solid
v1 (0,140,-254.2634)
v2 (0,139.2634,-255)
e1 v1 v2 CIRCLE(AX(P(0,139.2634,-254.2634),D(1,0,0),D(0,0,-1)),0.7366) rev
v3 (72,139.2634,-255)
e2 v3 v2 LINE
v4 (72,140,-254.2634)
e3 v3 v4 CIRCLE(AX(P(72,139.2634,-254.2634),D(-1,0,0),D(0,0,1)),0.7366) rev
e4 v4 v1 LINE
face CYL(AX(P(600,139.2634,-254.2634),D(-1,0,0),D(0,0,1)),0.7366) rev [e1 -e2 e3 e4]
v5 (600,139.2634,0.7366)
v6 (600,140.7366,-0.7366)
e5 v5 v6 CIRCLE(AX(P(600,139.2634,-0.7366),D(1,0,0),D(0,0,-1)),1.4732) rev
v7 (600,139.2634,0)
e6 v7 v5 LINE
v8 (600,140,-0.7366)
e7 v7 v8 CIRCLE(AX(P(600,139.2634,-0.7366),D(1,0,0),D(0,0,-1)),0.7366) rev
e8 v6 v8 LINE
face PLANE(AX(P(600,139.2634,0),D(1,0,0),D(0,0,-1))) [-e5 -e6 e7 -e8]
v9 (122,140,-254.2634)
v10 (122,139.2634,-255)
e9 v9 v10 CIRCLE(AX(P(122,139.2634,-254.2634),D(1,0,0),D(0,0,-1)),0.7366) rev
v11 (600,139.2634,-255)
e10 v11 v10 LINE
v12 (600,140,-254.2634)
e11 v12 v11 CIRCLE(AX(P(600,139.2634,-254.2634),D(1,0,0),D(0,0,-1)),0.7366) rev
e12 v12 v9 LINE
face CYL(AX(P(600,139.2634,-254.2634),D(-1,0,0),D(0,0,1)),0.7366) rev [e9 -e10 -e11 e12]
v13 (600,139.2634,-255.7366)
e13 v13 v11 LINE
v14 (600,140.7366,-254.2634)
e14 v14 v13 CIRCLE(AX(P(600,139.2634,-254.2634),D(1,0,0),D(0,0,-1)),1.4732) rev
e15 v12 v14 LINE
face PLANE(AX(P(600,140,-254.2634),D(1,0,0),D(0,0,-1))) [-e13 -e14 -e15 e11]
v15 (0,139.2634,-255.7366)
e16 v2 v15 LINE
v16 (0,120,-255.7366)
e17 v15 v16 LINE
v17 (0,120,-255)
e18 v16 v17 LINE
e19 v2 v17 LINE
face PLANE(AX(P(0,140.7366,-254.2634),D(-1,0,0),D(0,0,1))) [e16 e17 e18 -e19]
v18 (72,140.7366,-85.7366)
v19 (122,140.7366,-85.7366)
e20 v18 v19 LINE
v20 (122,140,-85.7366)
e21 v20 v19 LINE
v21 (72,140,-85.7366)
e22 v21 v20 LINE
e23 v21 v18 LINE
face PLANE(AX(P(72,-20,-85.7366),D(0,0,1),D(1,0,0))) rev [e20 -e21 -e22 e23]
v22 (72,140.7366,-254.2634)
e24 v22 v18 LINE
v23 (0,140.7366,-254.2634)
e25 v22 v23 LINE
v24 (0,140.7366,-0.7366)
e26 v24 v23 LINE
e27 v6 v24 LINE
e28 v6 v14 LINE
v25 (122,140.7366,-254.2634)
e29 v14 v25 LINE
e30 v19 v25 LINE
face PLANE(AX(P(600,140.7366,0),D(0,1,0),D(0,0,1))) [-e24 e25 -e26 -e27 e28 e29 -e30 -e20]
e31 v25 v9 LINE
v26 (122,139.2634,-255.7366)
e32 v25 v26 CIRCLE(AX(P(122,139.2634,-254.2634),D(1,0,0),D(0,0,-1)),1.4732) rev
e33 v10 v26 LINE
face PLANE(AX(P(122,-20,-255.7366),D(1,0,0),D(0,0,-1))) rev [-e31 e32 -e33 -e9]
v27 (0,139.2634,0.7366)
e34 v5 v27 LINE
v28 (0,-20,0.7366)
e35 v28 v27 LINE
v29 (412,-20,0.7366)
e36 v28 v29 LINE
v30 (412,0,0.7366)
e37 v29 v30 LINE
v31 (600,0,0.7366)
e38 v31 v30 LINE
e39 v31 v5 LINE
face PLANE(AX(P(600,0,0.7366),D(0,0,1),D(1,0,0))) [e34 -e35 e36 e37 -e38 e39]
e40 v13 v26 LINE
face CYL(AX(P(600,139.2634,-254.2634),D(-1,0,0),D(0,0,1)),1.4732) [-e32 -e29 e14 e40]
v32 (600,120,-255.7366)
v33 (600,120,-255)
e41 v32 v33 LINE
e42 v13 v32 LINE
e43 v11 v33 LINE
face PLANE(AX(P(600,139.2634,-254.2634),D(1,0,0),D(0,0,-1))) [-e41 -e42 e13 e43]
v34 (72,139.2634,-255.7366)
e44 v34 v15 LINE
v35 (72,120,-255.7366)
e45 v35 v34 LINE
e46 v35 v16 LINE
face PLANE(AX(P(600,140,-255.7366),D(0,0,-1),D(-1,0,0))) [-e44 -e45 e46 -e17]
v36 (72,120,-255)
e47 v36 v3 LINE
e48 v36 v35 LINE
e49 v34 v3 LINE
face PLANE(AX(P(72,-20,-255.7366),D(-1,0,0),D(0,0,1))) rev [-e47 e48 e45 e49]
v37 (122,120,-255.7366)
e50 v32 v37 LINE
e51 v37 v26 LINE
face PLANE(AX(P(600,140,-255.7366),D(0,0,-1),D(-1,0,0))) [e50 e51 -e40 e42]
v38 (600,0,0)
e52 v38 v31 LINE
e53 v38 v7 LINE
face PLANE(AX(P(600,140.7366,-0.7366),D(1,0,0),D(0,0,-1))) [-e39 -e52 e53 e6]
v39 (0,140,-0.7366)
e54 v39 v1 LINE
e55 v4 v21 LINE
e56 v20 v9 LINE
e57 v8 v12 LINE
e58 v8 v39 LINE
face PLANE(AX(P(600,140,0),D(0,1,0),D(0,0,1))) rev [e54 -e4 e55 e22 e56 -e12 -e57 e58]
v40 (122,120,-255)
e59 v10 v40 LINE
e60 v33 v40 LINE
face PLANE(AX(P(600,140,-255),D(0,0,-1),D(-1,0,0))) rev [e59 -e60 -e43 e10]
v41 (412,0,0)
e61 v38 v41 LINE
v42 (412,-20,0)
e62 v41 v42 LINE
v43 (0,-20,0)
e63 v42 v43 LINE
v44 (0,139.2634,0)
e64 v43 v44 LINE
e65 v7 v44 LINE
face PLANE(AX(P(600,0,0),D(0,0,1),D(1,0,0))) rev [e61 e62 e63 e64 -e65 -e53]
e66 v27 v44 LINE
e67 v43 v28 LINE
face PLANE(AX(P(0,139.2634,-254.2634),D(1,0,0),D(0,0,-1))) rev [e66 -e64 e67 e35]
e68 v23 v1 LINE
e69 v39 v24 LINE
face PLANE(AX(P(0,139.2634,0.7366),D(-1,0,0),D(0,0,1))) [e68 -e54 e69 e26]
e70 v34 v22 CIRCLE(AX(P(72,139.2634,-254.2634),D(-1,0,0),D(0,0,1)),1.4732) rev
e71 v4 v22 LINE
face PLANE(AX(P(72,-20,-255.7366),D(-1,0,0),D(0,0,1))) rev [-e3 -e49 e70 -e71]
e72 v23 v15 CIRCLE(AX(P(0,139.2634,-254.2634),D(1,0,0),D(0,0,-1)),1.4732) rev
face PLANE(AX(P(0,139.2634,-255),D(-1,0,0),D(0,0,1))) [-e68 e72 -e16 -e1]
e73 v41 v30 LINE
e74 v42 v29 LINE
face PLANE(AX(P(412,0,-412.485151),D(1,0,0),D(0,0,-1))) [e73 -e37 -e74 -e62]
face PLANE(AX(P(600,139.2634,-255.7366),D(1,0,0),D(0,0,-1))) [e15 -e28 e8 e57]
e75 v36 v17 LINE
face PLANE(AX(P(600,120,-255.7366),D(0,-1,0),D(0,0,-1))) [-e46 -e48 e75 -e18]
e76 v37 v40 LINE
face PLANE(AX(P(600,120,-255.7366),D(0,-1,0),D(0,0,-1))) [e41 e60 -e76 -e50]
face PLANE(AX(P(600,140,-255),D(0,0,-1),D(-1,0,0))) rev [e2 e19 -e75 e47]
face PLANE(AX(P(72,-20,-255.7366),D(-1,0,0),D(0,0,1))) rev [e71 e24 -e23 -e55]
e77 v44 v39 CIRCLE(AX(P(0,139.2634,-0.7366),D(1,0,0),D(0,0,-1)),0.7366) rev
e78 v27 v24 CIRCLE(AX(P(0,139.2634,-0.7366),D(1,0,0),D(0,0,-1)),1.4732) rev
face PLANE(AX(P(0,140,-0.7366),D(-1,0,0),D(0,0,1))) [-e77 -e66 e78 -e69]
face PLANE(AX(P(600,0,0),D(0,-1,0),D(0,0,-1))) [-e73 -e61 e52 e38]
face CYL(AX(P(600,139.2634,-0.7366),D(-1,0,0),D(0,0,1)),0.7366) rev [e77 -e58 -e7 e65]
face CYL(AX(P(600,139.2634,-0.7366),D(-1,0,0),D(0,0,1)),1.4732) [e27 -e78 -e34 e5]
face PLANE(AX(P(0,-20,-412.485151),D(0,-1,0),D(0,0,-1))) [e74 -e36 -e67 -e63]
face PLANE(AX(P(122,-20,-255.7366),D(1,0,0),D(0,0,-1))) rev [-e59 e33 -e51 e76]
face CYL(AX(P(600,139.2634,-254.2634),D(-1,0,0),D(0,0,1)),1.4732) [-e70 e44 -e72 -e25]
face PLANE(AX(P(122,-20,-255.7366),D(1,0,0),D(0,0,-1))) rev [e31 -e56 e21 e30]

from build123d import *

# Parameters (mm, degrees)
BASE_FLANGE1_DEPTH  = 600
SKETCH7_W           = 412
SKETCH7_H           = 20
BOSS_EXTRUDE1_DEPTH = 0.7366
SKETCH8_W           = 50
SKETCH8_H           = 170
CUT_EXTRUDE2_DEPTH  = 672.742110604


# Sheet-metal steps are written as plain solids
with BuildPart() as part:
    # Sketch1 → Base-Flange1 (new body)
    with BuildSketch(Plane(origin=(0, 0, 0), x_dir=(0, 0, -1), z_dir=(1, 0, 0))):
        with BuildLine():
            Line((0, 0), (0, 139.2634))
            ThreePointArc((0, 139.2634), (0.215745145, 139.784254855), (0.7366, 140))
            Line((0.7366, 140), (254.2634, 140))
            ThreePointArc((254.2634, 140), (254.784254855, 139.784254855), (255, 139.2634))
            Line((255, 139.2634), (255, 120))
            Line((255, 120), (255.7366, 120))
            Line((255.7366, 120), (255.7366, 139.2634))
            ThreePointArc((255.7366, 139.2634), (255.30510971, 140.30510971), (254.2634, 140.7366))
            Line((254.2634, 140.7366), (0.7366, 140.7366))
            ThreePointArc((0.7366, 140.7366), (-0.30510971, 140.30510971), (-0.7366, 139.2634))
            Line((-0.7366, 139.2634), (-0.7366, 0))
            Line((-0.7366, 0), (0, 0))
        make_face()
    extrude(amount=BASE_FLANGE1_DEPTH)

    # Sketch7 → Boss-Extrude1 (add)
    with BuildSketch(Plane.XY.offset(0.7366)):
        with Locations((206, -10)):
            Rectangle(SKETCH7_W, SKETCH7_H)
    extrude(amount=-BOSS_EXTRUDE1_DEPTH)

    # Sketch8 → Cut-Extrude2 (cut, through all)
    with BuildSketch(Plane(origin=(0, 140.7366, 0), x_dir=(1, 0, 0), z_dir=(0, 1, 0))):
        with Locations((97, 170.7366)):
            Rectangle(SKETCH8_W, SKETCH8_H)
    extrude(amount=-CUT_EXTRUDE2_DEPTH, mode=Mode.SUBTRACT)


solid = part.part
